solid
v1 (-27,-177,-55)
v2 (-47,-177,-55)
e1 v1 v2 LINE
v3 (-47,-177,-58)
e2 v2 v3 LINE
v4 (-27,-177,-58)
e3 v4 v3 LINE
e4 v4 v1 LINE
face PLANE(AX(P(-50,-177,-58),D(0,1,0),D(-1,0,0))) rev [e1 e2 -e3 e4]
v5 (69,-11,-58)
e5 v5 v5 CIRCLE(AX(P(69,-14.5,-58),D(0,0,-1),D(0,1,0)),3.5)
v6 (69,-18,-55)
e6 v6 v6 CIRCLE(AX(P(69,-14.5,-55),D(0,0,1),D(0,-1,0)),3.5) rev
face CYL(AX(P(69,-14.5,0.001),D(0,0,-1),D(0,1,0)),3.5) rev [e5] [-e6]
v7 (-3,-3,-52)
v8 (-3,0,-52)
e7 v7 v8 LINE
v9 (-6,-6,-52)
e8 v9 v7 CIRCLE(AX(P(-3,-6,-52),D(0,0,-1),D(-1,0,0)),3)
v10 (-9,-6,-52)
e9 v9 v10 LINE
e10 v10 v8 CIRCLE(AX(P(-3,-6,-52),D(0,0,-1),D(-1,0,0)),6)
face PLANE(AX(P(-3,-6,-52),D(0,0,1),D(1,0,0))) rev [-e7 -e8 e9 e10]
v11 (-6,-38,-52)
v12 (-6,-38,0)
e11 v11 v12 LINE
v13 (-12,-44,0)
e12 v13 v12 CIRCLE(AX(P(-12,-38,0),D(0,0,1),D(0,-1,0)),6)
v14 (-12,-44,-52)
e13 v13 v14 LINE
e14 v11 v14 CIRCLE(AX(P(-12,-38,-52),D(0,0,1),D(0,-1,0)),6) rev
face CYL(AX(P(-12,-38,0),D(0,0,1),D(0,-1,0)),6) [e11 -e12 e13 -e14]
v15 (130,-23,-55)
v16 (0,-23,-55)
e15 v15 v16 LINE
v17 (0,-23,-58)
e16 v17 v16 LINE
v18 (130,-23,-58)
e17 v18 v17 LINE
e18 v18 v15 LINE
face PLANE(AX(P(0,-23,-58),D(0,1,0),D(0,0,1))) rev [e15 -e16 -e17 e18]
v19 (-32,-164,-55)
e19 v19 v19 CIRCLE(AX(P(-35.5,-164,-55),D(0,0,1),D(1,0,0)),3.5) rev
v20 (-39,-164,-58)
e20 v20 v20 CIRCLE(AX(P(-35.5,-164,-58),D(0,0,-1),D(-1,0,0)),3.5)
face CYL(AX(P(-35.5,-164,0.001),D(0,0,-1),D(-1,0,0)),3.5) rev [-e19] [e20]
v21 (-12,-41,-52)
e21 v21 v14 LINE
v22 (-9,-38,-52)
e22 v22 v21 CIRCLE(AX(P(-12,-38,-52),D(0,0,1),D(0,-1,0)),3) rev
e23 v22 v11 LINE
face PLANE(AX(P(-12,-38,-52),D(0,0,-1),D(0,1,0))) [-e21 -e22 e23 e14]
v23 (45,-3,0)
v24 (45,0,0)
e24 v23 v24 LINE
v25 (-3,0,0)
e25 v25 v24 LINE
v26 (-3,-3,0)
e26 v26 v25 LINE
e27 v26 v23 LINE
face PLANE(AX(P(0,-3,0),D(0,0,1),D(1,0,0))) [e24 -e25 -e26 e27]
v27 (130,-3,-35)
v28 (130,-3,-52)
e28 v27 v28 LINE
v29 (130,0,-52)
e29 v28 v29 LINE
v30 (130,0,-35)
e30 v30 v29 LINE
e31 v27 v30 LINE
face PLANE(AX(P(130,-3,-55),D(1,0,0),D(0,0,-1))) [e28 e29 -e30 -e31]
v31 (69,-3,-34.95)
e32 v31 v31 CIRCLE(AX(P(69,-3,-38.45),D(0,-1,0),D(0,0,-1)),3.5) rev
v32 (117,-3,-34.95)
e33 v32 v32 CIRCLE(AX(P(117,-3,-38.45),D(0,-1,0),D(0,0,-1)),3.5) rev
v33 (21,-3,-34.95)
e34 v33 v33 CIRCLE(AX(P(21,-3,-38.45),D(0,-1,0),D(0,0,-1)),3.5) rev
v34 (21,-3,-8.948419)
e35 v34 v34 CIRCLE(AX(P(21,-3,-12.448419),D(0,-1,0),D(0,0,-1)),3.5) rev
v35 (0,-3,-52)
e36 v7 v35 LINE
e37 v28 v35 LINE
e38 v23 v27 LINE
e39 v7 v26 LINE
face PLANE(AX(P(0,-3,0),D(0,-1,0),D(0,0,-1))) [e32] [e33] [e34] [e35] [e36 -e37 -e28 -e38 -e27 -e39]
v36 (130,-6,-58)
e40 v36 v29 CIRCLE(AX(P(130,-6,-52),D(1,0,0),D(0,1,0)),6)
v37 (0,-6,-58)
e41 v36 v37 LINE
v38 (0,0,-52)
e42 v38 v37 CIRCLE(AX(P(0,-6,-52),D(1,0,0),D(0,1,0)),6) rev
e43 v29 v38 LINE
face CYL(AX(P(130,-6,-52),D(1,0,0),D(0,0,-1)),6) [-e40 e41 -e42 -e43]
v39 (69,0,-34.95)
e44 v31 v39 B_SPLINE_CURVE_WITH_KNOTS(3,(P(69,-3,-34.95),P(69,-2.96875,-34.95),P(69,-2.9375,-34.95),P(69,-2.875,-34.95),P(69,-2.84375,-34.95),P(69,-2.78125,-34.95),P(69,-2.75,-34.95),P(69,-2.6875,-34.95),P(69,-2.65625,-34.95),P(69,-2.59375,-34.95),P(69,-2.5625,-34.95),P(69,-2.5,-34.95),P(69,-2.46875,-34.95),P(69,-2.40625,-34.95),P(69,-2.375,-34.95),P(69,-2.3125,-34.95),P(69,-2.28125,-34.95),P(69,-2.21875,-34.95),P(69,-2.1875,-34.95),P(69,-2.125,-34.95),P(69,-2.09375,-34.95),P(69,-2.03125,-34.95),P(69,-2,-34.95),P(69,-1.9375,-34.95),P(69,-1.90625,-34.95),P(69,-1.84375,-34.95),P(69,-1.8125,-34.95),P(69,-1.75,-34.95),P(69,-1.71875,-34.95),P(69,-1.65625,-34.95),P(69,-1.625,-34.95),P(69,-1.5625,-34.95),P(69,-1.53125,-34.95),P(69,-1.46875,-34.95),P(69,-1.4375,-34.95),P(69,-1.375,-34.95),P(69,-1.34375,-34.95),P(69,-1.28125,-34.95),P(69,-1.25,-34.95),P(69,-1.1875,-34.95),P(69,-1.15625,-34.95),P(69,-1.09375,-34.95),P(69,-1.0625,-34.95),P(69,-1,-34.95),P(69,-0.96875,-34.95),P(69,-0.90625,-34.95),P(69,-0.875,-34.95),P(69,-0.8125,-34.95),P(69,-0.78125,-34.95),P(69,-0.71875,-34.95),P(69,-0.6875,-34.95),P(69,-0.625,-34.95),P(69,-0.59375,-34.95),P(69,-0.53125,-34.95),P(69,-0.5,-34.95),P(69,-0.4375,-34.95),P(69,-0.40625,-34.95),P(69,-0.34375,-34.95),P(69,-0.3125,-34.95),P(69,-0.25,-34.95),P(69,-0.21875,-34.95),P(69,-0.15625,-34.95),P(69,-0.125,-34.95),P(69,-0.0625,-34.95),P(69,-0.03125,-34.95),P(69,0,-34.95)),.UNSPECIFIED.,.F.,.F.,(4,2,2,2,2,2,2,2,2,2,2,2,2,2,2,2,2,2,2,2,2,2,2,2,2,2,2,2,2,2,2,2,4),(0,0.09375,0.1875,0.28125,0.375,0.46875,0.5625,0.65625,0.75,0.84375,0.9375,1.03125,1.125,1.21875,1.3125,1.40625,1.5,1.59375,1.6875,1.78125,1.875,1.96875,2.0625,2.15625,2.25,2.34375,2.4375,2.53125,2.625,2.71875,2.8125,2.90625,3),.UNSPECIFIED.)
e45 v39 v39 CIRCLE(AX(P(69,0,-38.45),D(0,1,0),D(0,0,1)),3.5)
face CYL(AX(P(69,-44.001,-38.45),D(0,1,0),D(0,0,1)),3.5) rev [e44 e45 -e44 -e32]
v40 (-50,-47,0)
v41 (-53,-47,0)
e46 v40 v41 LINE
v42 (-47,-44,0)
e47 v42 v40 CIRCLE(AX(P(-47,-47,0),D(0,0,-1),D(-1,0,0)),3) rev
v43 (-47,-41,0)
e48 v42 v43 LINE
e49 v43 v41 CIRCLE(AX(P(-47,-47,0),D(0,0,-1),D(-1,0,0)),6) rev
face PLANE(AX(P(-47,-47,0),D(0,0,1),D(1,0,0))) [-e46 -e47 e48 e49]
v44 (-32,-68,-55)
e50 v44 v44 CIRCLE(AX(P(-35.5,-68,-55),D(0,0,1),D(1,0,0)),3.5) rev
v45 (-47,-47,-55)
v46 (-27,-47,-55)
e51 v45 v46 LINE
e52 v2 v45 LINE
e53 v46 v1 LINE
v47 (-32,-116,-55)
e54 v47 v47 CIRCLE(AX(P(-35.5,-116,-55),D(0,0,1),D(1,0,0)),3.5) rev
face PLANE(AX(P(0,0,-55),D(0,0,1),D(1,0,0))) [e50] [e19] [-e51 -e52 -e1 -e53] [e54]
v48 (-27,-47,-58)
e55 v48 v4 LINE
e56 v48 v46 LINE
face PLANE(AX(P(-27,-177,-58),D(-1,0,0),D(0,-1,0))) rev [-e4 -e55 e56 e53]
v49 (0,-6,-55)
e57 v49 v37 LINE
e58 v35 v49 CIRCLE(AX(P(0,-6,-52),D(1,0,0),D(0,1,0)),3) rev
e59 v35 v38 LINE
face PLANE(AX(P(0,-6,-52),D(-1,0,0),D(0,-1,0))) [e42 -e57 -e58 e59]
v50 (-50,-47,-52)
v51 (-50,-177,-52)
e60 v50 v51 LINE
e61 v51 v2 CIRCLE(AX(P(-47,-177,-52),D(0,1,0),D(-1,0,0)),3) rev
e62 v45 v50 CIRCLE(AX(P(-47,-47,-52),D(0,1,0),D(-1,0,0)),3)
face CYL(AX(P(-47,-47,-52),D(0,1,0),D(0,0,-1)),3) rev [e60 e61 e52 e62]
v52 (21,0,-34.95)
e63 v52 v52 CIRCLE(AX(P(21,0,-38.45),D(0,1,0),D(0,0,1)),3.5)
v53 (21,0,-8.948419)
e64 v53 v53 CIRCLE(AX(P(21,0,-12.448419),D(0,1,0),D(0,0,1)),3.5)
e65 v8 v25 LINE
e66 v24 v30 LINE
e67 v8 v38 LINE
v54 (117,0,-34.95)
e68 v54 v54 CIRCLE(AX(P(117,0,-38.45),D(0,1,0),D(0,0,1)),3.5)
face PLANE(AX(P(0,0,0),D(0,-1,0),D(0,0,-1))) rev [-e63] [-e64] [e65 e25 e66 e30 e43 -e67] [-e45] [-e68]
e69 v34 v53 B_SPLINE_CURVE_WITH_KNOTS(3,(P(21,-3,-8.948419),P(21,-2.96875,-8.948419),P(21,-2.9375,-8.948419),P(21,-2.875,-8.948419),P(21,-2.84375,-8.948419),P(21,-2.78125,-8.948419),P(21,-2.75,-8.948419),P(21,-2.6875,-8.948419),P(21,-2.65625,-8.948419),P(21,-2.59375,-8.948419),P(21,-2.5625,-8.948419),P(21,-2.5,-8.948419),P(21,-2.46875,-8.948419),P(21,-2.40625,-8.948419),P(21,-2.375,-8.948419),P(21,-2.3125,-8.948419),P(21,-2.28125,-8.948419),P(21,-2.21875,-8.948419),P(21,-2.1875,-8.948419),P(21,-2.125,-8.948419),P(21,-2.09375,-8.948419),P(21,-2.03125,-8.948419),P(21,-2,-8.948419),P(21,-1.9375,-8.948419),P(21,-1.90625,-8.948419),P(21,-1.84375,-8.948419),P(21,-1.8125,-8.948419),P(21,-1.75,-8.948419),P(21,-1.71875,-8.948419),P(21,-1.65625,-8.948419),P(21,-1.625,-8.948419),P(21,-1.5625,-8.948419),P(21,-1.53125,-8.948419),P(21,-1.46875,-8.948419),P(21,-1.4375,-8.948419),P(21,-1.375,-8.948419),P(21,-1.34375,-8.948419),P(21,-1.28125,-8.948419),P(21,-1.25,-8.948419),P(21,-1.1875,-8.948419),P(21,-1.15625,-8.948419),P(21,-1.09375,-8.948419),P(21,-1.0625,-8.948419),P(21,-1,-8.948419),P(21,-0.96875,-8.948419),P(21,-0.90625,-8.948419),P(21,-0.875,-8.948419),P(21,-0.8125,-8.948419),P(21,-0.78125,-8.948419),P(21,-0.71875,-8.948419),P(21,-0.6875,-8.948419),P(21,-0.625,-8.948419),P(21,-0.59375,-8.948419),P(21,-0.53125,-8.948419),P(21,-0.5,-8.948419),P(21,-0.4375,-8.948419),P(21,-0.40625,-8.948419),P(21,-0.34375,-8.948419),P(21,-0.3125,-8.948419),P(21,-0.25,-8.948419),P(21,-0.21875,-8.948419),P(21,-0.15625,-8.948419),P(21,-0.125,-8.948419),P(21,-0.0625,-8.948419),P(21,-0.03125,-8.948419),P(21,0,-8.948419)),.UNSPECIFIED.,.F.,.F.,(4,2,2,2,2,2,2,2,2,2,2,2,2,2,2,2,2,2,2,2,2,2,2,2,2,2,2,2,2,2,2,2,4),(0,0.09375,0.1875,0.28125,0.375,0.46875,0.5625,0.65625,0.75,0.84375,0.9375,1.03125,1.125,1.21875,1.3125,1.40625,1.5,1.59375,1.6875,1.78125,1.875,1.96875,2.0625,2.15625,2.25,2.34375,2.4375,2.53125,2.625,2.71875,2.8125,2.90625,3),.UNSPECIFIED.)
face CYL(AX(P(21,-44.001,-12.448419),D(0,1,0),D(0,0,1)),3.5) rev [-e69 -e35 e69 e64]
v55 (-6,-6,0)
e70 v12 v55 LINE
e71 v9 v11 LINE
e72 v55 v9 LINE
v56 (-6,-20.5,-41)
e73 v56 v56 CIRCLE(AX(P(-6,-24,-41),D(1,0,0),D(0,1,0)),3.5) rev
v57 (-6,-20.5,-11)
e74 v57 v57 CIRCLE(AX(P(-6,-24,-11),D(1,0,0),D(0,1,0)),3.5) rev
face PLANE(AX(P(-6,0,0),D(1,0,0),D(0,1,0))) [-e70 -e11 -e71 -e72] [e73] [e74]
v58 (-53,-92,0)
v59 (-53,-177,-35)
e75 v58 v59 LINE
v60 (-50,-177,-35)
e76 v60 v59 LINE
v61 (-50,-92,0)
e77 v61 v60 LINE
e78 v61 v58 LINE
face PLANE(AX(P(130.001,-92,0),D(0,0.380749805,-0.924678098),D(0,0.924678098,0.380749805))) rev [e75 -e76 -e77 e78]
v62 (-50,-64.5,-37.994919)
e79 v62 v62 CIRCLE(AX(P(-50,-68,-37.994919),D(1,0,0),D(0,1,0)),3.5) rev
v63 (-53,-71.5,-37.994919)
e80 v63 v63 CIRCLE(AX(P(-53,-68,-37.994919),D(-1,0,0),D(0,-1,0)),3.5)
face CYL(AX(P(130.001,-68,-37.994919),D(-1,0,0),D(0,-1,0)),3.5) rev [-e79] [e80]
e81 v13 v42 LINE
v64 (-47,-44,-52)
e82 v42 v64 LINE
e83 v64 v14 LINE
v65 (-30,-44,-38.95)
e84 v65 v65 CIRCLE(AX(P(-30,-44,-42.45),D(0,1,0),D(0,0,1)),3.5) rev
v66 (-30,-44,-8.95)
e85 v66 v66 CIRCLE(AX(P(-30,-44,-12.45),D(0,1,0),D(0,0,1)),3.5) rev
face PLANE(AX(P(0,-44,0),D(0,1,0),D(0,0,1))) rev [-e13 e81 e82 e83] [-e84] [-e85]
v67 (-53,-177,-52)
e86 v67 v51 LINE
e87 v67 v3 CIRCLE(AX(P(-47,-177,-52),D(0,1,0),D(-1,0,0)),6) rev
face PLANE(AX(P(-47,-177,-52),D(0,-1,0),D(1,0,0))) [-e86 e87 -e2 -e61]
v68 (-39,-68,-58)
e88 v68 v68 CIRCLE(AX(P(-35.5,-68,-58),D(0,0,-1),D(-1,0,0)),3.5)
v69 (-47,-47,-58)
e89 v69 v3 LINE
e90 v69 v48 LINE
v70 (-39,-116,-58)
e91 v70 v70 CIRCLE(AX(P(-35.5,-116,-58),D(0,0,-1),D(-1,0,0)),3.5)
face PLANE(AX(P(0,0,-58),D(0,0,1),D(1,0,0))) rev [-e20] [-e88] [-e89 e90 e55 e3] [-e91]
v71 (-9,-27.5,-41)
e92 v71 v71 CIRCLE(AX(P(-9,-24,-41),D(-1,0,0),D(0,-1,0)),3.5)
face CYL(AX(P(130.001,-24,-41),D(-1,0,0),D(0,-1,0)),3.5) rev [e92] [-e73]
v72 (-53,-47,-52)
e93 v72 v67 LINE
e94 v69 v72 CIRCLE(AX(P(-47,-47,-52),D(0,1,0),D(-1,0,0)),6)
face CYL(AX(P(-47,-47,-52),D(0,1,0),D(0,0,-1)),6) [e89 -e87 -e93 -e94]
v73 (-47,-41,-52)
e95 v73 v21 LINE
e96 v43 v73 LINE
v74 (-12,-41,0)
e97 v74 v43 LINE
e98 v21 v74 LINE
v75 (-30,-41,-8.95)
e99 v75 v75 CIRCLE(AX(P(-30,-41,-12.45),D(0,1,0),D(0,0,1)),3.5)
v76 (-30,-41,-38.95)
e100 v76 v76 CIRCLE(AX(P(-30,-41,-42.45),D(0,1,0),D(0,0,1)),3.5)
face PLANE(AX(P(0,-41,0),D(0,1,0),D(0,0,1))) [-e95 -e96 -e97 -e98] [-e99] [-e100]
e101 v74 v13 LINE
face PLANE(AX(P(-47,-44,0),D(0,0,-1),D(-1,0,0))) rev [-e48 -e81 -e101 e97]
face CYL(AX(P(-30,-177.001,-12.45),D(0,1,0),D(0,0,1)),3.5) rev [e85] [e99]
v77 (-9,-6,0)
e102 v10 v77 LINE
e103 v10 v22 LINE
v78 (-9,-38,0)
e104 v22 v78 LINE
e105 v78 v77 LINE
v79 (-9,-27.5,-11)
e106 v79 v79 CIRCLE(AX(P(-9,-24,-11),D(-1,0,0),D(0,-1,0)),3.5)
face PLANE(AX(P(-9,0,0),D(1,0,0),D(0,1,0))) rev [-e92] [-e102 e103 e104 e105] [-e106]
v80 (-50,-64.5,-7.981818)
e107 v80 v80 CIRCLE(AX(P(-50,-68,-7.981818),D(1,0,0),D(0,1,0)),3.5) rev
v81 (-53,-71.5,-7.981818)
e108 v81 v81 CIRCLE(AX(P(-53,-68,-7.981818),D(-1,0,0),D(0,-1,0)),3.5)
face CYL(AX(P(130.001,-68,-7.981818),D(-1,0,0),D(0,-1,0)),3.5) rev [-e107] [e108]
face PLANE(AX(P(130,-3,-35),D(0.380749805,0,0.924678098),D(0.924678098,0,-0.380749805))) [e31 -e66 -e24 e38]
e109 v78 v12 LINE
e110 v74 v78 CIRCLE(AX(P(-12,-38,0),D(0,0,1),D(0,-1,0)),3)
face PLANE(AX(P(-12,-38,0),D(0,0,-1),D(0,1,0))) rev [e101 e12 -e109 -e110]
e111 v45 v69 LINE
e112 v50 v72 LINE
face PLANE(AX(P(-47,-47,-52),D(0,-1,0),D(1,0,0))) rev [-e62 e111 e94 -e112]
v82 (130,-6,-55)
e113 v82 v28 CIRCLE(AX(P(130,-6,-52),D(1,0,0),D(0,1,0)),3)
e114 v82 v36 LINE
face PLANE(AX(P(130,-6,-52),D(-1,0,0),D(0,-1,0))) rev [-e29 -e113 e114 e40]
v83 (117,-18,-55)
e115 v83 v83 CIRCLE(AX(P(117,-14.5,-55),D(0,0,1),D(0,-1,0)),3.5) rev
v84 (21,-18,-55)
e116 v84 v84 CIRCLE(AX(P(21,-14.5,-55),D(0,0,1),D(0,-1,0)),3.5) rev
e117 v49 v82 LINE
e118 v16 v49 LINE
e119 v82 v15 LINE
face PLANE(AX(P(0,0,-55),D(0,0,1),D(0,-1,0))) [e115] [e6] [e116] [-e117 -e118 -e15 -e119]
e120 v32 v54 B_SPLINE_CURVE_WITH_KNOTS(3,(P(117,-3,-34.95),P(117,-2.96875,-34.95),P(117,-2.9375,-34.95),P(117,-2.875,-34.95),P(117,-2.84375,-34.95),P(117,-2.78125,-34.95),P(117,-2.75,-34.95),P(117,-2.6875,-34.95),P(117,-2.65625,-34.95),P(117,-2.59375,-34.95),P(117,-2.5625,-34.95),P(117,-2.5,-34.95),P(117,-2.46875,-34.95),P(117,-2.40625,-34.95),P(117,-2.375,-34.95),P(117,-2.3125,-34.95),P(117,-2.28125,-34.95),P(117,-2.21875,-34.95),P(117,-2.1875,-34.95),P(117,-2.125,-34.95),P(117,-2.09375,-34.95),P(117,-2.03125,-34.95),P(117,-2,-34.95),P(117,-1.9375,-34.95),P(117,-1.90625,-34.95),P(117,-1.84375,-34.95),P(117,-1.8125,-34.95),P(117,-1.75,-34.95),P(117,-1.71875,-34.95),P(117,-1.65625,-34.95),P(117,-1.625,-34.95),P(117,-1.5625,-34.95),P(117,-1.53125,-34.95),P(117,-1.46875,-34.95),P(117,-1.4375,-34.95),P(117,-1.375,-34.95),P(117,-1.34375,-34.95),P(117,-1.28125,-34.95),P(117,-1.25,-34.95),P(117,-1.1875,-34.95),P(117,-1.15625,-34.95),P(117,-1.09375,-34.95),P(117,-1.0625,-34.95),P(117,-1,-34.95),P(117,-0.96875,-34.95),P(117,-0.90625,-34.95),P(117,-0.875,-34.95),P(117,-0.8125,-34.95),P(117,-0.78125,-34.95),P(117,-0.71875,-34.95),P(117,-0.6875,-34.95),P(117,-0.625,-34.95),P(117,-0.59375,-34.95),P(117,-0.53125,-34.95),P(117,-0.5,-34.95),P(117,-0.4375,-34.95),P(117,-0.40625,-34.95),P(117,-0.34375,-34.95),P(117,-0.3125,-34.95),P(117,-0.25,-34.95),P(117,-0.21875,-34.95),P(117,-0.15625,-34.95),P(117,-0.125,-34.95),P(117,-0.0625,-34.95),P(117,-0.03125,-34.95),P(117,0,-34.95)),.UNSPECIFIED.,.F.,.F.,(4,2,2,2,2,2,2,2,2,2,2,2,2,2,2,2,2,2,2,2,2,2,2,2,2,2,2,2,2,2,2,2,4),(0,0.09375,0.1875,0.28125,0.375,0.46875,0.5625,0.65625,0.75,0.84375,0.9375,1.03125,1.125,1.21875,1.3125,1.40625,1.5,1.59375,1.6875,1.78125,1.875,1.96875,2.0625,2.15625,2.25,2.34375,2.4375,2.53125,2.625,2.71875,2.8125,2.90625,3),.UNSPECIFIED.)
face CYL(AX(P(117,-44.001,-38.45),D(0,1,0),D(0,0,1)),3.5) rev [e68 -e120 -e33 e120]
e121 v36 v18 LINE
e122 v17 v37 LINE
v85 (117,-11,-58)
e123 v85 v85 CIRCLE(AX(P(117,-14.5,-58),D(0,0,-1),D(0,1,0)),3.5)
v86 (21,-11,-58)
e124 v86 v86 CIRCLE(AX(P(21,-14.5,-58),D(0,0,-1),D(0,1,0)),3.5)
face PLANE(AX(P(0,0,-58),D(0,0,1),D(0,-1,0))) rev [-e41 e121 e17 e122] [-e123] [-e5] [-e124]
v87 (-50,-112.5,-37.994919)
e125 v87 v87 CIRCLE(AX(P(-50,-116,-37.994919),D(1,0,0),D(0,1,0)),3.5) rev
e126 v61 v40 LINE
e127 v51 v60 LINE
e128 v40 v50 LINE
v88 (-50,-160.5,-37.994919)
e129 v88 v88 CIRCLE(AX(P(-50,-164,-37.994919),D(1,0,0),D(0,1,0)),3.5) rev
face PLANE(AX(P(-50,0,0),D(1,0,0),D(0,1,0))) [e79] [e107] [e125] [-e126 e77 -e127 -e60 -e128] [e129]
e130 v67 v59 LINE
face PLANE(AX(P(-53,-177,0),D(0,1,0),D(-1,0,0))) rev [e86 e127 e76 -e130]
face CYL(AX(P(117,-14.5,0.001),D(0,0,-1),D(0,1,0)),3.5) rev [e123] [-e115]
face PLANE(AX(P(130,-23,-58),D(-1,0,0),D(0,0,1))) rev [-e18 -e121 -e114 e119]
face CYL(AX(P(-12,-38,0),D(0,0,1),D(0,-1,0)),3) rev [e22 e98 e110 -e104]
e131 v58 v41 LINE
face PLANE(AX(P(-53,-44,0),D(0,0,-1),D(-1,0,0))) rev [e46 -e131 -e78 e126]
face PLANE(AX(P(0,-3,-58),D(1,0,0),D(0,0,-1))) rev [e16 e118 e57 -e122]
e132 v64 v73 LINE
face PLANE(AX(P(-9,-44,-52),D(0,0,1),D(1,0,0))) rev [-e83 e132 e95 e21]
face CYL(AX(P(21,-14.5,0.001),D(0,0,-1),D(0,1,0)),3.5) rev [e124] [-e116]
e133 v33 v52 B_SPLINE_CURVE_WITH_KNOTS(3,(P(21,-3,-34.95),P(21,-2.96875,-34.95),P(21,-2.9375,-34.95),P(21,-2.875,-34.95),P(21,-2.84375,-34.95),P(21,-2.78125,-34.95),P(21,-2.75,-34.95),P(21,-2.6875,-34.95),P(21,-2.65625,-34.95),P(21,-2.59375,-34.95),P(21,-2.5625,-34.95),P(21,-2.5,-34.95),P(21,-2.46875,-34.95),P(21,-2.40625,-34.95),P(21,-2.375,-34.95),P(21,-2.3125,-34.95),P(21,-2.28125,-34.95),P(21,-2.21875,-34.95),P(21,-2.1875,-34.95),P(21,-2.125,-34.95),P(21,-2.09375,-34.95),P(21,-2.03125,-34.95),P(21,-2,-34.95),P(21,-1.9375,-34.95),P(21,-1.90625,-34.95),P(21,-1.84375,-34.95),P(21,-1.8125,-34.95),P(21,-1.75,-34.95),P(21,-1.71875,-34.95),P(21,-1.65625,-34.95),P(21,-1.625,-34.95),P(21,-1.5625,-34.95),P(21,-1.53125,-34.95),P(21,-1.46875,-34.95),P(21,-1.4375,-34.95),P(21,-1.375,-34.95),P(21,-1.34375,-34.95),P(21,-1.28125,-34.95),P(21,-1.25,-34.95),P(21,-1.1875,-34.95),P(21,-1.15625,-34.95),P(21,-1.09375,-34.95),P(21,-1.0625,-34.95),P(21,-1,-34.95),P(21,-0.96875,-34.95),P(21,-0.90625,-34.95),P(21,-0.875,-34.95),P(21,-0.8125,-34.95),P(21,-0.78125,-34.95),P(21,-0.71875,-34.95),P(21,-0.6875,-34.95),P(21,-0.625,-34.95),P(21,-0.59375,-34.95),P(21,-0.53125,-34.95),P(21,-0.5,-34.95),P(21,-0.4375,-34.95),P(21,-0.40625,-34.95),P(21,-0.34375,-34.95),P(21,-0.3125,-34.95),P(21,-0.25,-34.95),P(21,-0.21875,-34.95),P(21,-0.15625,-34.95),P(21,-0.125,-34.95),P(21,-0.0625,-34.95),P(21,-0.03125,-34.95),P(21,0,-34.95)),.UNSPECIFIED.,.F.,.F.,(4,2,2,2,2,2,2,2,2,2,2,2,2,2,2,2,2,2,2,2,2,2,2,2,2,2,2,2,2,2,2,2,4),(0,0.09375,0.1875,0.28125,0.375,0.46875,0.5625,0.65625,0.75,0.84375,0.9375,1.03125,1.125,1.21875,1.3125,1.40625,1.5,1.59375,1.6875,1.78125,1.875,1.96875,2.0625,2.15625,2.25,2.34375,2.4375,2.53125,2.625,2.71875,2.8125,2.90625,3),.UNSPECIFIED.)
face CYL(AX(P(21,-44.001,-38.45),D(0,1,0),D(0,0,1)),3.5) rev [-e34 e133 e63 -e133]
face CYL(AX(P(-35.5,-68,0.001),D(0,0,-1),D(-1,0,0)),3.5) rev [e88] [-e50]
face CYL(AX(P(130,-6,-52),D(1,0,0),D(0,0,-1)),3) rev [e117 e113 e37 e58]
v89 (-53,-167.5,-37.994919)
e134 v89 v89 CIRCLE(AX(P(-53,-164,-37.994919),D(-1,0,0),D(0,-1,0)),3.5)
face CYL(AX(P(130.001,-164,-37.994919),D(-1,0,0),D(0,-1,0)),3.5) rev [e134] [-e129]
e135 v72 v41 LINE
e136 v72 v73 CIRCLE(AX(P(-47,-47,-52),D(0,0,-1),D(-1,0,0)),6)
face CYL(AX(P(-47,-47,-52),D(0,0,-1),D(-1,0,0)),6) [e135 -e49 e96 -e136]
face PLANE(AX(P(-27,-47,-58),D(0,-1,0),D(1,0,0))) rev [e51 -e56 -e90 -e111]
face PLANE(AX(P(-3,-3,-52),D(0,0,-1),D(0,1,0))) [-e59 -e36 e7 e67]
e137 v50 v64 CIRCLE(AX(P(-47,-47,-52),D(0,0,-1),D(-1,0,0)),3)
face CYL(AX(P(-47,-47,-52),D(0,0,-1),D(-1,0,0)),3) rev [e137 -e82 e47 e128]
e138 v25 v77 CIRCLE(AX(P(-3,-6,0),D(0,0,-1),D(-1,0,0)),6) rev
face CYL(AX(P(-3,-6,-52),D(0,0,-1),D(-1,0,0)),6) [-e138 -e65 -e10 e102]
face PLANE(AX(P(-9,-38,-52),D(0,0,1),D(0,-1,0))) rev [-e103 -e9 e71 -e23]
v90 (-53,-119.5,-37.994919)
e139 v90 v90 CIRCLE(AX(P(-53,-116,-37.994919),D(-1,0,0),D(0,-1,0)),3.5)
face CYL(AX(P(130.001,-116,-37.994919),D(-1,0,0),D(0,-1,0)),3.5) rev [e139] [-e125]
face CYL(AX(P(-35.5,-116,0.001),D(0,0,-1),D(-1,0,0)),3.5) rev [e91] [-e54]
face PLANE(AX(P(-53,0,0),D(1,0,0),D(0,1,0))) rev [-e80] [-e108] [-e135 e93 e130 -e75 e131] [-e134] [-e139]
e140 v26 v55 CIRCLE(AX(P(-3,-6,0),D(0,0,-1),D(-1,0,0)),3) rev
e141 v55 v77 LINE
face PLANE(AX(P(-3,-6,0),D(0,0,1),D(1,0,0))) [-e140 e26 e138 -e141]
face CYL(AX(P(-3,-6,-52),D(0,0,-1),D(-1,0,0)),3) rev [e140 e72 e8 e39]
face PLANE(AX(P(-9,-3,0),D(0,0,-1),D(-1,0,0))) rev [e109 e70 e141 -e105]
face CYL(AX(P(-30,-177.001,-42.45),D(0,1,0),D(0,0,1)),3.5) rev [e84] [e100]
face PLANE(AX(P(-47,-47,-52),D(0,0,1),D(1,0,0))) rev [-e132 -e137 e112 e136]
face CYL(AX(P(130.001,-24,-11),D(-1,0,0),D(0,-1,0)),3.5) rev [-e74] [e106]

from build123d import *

# Parameters (mm, degrees)
SM_BASE_FLANGE_1_DEPTH           = 3
SM_EDGE_FLANGE_1_STRIP_W         = 18
SM_EDGE_FLANGE_1_STRIP_H         = 3
SM_EDGE_FLANGE_1_STRIP_CUT_DEPTH = 130
SM_EDGE_FLANGE_1_DEPTH           = 130
SM_EDGE_FLANGE_2_DEPTH           = 52
SM_EDGE_FLANGE_5_DEPTH           = 52
CUT_EXTRUDE_2_REACH              = 158.911
SKETCH_48_R                      = 3.5
CUT_EXTRUDE_3_REACH              = 150.997
SKETCH_49_R                      = 3.5
CUT_EXTRUDE_4_REACH              = 150.997
SKETCH_51_R                      = 3.5
SM_EDGE_FLANGE_6_DEPTH           = 52
CUT_EXTRUDE_5_REACH              = 263.117
SKETCH_59_R                      = 3.5
SM_EDGE_FLANGE_8_DEPTH           = 130
CUT_EXTRUDE_6_REACH              = 229.141
SKETCH_68_R                      = 3.5
CUT_EXTRUDE_7_REACH              = 198.876
SKETCH_69_R                      = 3.5


# Sheet-metal steps are written as plain solids
with BuildPart() as part:
    # Sketch 2 → Базовая кромка1 (new body)
    with BuildSketch(Plane(origin=(0, 0, 0), x_dir=(1, 0, 0), z_dir=(0, 1, 0))):
        Polygon((45, 55), (130, 55), (130, 35), (45, 0), (0, 0), (0, 55), align=None)
    extrude(amount=-SM_BASE_FLANGE_1_DEPTH)

    # Ребро-кромка1 strip (across the edge) → Ребро-кромка1 strip cut (cut)
    with BuildSketch(Plane(origin=(0, -3, -55), x_dir=(0, 0, 1), z_dir=(1, 0, 0))):
        with Locations((-6, -1.5)):
            Rectangle(SM_EDGE_FLANGE_1_STRIP_W, SM_EDGE_FLANGE_1_STRIP_H)
    extrude(amount=SM_EDGE_FLANGE_1_STRIP_CUT_DEPTH, mode=Mode.SUBTRACT)

    # Ребро-кромка1 section (across the edge) → Ребро-кромка1 (add)
    with BuildSketch(Plane(origin=(0, -3, -55), x_dir=(0, 0, 1), z_dir=(1, 0, 0))):
        with BuildLine():
            Line((-3, 3), (-3, 20))
            Line((-3, 20), (0, 20))
            Line((0, 20), (0, 3))
            ThreePointArc((0, 3), (0.878679656, 0.878679656), (3, 0))
            Line((3, 0), (3, -3))
            ThreePointArc((3, -3), (-1.242640687, -1.242640687), (-3, 3))
        make_face()
    extrude(amount=SM_EDGE_FLANGE_1_DEPTH)

    # Ребро-кромка2 section (across the edge) → Ребро-кромка2 (add)
    with BuildSketch(Plane(origin=(-6, -3, 0), x_dir=(1, 0, 0), z_dir=(0, 0, -1))):
        with BuildLine():
            Line((-3, 3), (-3, 35))
            Line((-3, 35), (0, 35))
            Line((0, 35), (0, 3))
            ThreePointArc((0, 3), (0.878679656, 0.878679656), (3, 0))
            Line((3, 0), (6, 0))
            Line((6, 0), (6, -3))
            Line((6, -3), (3, -3))
            ThreePointArc((3, -3), (-1.242640687, -1.242640687), (-3, 3))
        make_face()
    extrude(amount=SM_EDGE_FLANGE_2_DEPTH)

    # Ребро-кромка5 section (across the edge) → Ребро-кромка5 (add)
    with BuildSketch(Plane(origin=(-9, -41, -52), x_dir=(0, 1, 0), z_dir=(0, 0, 1))):
        with BuildLine():
            Line((-3, 3), (-3, 38))
            Line((-3, 38), (0, 38))
            Line((0, 38), (0, 3))
            ThreePointArc((0, 3), (0.878679656, 0.878679656), (3, 0))
            Line((3, 0), (3, -3))
            ThreePointArc((3, -3), (-1.242640687, -1.242640687), (-3, 3))
        make_face()
    extrude(amount=SM_EDGE_FLANGE_5_DEPTH)

    # Эскиз48 → Вырез-Вытянуть2 (cut, up to next)
    with BuildSketch(Plane.ZY.offset(9), mode=Mode.PRIVATE) as cut_extrude_2_sk1:
        with Locations(Location((-41, -24, 0), (0, 0, 270))):
            Circle(SKETCH_48_R)
    cut_extrude_2_tool1 = extrude(cut_extrude_2_sk1.sketch, amount=-CUT_EXTRUDE_2_REACH, mode=Mode.PRIVATE) & part.part
    # Эскиз48 → Вырез-Вытянуть2 (cut, up to next)
    with BuildSketch(Plane.ZY.offset(9), mode=Mode.PRIVATE) as cut_extrude_2_sk2:
        with Locations(Location((-11, -24, 0), (0, 0, 270))):
            Circle(SKETCH_48_R)
    cut_extrude_2_tool2 = extrude(cut_extrude_2_sk2.sketch, amount=-CUT_EXTRUDE_2_REACH, mode=Mode.PRIVATE) & part.part
    add(cut_extrude_2_tool1.solids().sort_by_distance((-9, -24, -41))[0], mode=Mode.SUBTRACT)
    add(cut_extrude_2_tool2.solids().sort_by_distance((-9, -24, -11))[0], mode=Mode.SUBTRACT)

    # Эскиз49 → Вырез-Вытянуть3 (cut, up to next)
    with BuildSketch(Plane(origin=(0, 0, 0), x_dir=(1, 0, 0), z_dir=(0, 1, 0)), mode=Mode.PRIVATE) as cut_extrude_3_sk1:
        with Locations(Location((21, 12.448418776, 0), (0, 0, 270))):
            Circle(SKETCH_49_R)
    cut_extrude_3_tool1 = extrude(cut_extrude_3_sk1.sketch, amount=-CUT_EXTRUDE_3_REACH, mode=Mode.PRIVATE) & part.part
    # Эскиз49 → Вырез-Вытянуть3 (cut, up to next)
    with BuildSketch(Plane(origin=(0, 0, 0), x_dir=(1, 0, 0), z_dir=(0, 1, 0)), mode=Mode.PRIVATE) as cut_extrude_3_sk2:
        with Locations(Location((21, 38.45, 0), (0, 0, 270))):
            Circle(SKETCH_49_R)
    cut_extrude_3_tool2 = extrude(cut_extrude_3_sk2.sketch, amount=-CUT_EXTRUDE_3_REACH, mode=Mode.PRIVATE) & part.part
    # Эскиз49 → Вырез-Вытянуть3 (cut, up to next)
    with BuildSketch(Plane(origin=(0, 0, 0), x_dir=(1, 0, 0), z_dir=(0, 1, 0)), mode=Mode.PRIVATE) as cut_extrude_3_sk3:
        with Locations(Location((117, 38.45, 0), (0, 0, 270))):
            Circle(SKETCH_49_R)
    cut_extrude_3_tool3 = extrude(cut_extrude_3_sk3.sketch, amount=-CUT_EXTRUDE_3_REACH, mode=Mode.PRIVATE) & part.part
    # Эскиз49 → Вырез-Вытянуть3 (cut, up to next)
    with BuildSketch(Plane(origin=(0, 0, 0), x_dir=(1, 0, 0), z_dir=(0, 1, 0)), mode=Mode.PRIVATE) as cut_extrude_3_sk4:
        with Locations(Location((69, 38.45, 0), (0, 0, 270))):
            Circle(SKETCH_49_R)
    cut_extrude_3_tool4 = extrude(cut_extrude_3_sk4.sketch, amount=-CUT_EXTRUDE_3_REACH, mode=Mode.PRIVATE) & part.part
    add(cut_extrude_3_tool1.solids().sort_by_distance((21, 0, -12.448419))[0], mode=Mode.SUBTRACT)
    add(cut_extrude_3_tool2.solids().sort_by_distance((21, 0, -38.45))[0], mode=Mode.SUBTRACT)
    add(cut_extrude_3_tool3.solids().sort_by_distance((117, 0, -38.45))[0], mode=Mode.SUBTRACT)
    add(cut_extrude_3_tool4.solids().sort_by_distance((69, 0, -38.45))[0], mode=Mode.SUBTRACT)

    # Эскиз51 → Вырез-Вытянуть4 (cut, up to next)
    with BuildSketch(Plane(origin=(0, 0, -58), x_dir=(-1, 0, 0), z_dir=(0, 0, -1)), mode=Mode.PRIVATE) as cut_extrude_4_sk1:
        with Locations(Location((-117, -14.5, 0), (0, 0, 90))):
            Circle(SKETCH_51_R)
    cut_extrude_4_tool1 = extrude(cut_extrude_4_sk1.sketch, amount=-CUT_EXTRUDE_4_REACH, mode=Mode.PRIVATE) & part.part
    # Эскиз51 → Вырез-Вытянуть4 (cut, up to next)
    with BuildSketch(Plane(origin=(0, 0, -58), x_dir=(-1, 0, 0), z_dir=(0, 0, -1)), mode=Mode.PRIVATE) as cut_extrude_4_sk2:
        with Locations(Location((-69, -14.5, 0), (0, 0, 90))):
            Circle(SKETCH_51_R)
    cut_extrude_4_tool2 = extrude(cut_extrude_4_sk2.sketch, amount=-CUT_EXTRUDE_4_REACH, mode=Mode.PRIVATE) & part.part
    # Эскиз51 → Вырез-Вытянуть4 (cut, up to next)
    with BuildSketch(Plane(origin=(0, 0, -58), x_dir=(-1, 0, 0), z_dir=(0, 0, -1)), mode=Mode.PRIVATE) as cut_extrude_4_sk3:
        with Locations(Location((-21, -14.5, 0), (0, 0, 90))):
            Circle(SKETCH_51_R)
    cut_extrude_4_tool3 = extrude(cut_extrude_4_sk3.sketch, amount=-CUT_EXTRUDE_4_REACH, mode=Mode.PRIVATE) & part.part
    add(cut_extrude_4_tool1.solids().sort_by_distance((117, -14.5, -58))[0], mode=Mode.SUBTRACT)
    add(cut_extrude_4_tool2.solids().sort_by_distance((69, -14.5, -58))[0], mode=Mode.SUBTRACT)
    add(cut_extrude_4_tool3.solids().sort_by_distance((21, -14.5, -58))[0], mode=Mode.SUBTRACT)

    # Ребро-кромка6 section (across the edge) → Ребро-кромка6 (add)
    with BuildSketch(Plane(origin=(-50, -44, 0), x_dir=(1, 0, 0), z_dir=(0, 0, -1))):
        with BuildLine():
            Line((-3, 3), (-3, 133))
            Line((-3, 133), (0, 133))
            Line((0, 133), (0, 3))
            ThreePointArc((0, 3), (0.878679656, 0.878679656), (3, 0))
            Line((3, 0), (3, -3))
            ThreePointArc((3, -3), (-1.242640687, -1.242640687), (-3, 3))
        make_face()
    extrude(amount=SM_EDGE_FLANGE_6_DEPTH)

    # Эскиз59 → Вырез-Вытянуть5 (cut, up to next)
    with BuildSketch(Plane.ZY.offset(53), mode=Mode.PRIVATE) as cut_extrude_5_sk1:
        with Locations(Location((-7.981818004, -68, 0), (0, 0, 270))):
            Circle(SKETCH_59_R)
    cut_extrude_5_tool1 = extrude(cut_extrude_5_sk1.sketch, amount=-CUT_EXTRUDE_5_REACH, mode=Mode.PRIVATE) & part.part
    # Эскиз59 → Вырез-Вытянуть5 (cut, up to next)
    with BuildSketch(Plane.ZY.offset(53), mode=Mode.PRIVATE) as cut_extrude_5_sk2:
        with Locations(Location((-37.994919226, -68, 0), (0, 0, 270))):
            Circle(SKETCH_59_R)
    cut_extrude_5_tool2 = extrude(cut_extrude_5_sk2.sketch, amount=-CUT_EXTRUDE_5_REACH, mode=Mode.PRIVATE) & part.part
    # Эскиз59 → Вырез-Вытянуть5 (cut, up to next)
    with BuildSketch(Plane.ZY.offset(53), mode=Mode.PRIVATE) as cut_extrude_5_sk3:
        with Locations(Location((-37.994919226, -116, 0), (0, 0, 270))):
            Circle(SKETCH_59_R)
    cut_extrude_5_tool3 = extrude(cut_extrude_5_sk3.sketch, amount=-CUT_EXTRUDE_5_REACH, mode=Mode.PRIVATE) & part.part
    # Эскиз59 → Вырез-Вытянуть5 (cut, up to next)
    with BuildSketch(Plane.ZY.offset(53), mode=Mode.PRIVATE) as cut_extrude_5_sk4:
        with Locations(Location((-37.994919226, -164, 0), (0, 0, 270))):
            Circle(SKETCH_59_R)
    cut_extrude_5_tool4 = extrude(cut_extrude_5_sk4.sketch, amount=-CUT_EXTRUDE_5_REACH, mode=Mode.PRIVATE) & part.part
    # Эскиз59 → Вырез-Вытянуть5 (cut, up to next)
    with BuildSketch(Plane.ZY.offset(53), mode=Mode.PRIVATE) as cut_extrude_5_sk5:
        Polygon((0, -92), (-35, -177), (0, -177), align=None)
    cut_extrude_5_tool5 = extrude(cut_extrude_5_sk5.sketch, amount=-CUT_EXTRUDE_5_REACH, mode=Mode.PRIVATE) & part.part
    add(cut_extrude_5_tool1.solids().sort_by_distance((-53, -68, -7.981818))[0], mode=Mode.SUBTRACT)
    add(cut_extrude_5_tool2.solids().sort_by_distance((-53, -68, -37.994919))[0], mode=Mode.SUBTRACT)
    add(cut_extrude_5_tool3.solids().sort_by_distance((-53, -116, -37.994919))[0], mode=Mode.SUBTRACT)
    add(cut_extrude_5_tool4.solids().sort_by_distance((-53, -164, -37.994919))[0], mode=Mode.SUBTRACT)
    add(cut_extrude_5_tool5.solids().sort_by_distance((-53, -148.666667, -11.666667))[0], mode=Mode.SUBTRACT)

    # Ребро-кромка8 section (across the edge) → Ребро-кромка8 (add)
    with BuildSketch(Plane(origin=(-50, -177, -55), x_dir=(0, 0, 1), z_dir=(0, 1, 0))):
        with BuildLine():
            Line((-3, 3), (-3, 23))
            Line((-3, 23), (0, 23))
            Line((0, 23), (0, 3))
            ThreePointArc((0, 3), (0.878679656, 0.878679656), (3, 0))
            Line((3, 0), (3, -3))
            ThreePointArc((3, -3), (-1.242640687, -1.242640687), (-3, 3))
        make_face()
    extrude(amount=SM_EDGE_FLANGE_8_DEPTH)

    # Эскиз68 → Вырез-Вытянуть6 (cut, up to next)
    with BuildSketch(Plane(origin=(0, 0, -58), x_dir=(-1, 0, 0), z_dir=(0, 0, -1)), mode=Mode.PRIVATE) as cut_extrude_6_sk1:
        with Locations((35.5, -68)):
            Circle(SKETCH_68_R)
    cut_extrude_6_tool1 = extrude(cut_extrude_6_sk1.sketch, amount=-CUT_EXTRUDE_6_REACH, mode=Mode.PRIVATE) & part.part
    # Эскиз68 → Вырез-Вытянуть6 (cut, up to next)
    with BuildSketch(Plane(origin=(0, 0, -58), x_dir=(-1, 0, 0), z_dir=(0, 0, -1)), mode=Mode.PRIVATE) as cut_extrude_6_sk2:
        with Locations((35.5, -116)):
            Circle(SKETCH_68_R)
    cut_extrude_6_tool2 = extrude(cut_extrude_6_sk2.sketch, amount=-CUT_EXTRUDE_6_REACH, mode=Mode.PRIVATE) & part.part
    # Эскиз68 → Вырез-Вытянуть6 (cut, up to next)
    with BuildSketch(Plane(origin=(0, 0, -58), x_dir=(-1, 0, 0), z_dir=(0, 0, -1)), mode=Mode.PRIVATE) as cut_extrude_6_sk3:
        with Locations((35.5, -164)):
            Circle(SKETCH_68_R)
    cut_extrude_6_tool3 = extrude(cut_extrude_6_sk3.sketch, amount=-CUT_EXTRUDE_6_REACH, mode=Mode.PRIVATE) & part.part
    add(cut_extrude_6_tool1.solids().sort_by_distance((-35.5, -68, -58))[0], mode=Mode.SUBTRACT)
    add(cut_extrude_6_tool2.solids().sort_by_distance((-35.5, -116, -58))[0], mode=Mode.SUBTRACT)
    add(cut_extrude_6_tool3.solids().sort_by_distance((-35.5, -164, -58))[0], mode=Mode.SUBTRACT)

    # Эскиз69 → Вырез-Вытянуть7 (cut, up to next)
    with BuildSketch(Plane(origin=(0, -41, 0), x_dir=(1, 0, 0), z_dir=(0, 1, 0)), mode=Mode.PRIVATE) as cut_extrude_7_sk1:
        with Locations(Location((-30, 42.45, 0), (0, 0, 270))):
            Circle(SKETCH_69_R)
    cut_extrude_7_tool1 = extrude(cut_extrude_7_sk1.sketch, amount=-CUT_EXTRUDE_7_REACH, mode=Mode.PRIVATE) & part.part
    # Эскиз69 → Вырез-Вытянуть7 (cut, up to next)
    with BuildSketch(Plane(origin=(0, -41, 0), x_dir=(1, 0, 0), z_dir=(0, 1, 0)), mode=Mode.PRIVATE) as cut_extrude_7_sk2:
        with Locations(Location((-30, 12.45, 0), (0, 0, 270))):
            Circle(SKETCH_69_R)
    cut_extrude_7_tool2 = extrude(cut_extrude_7_sk2.sketch, amount=-CUT_EXTRUDE_7_REACH, mode=Mode.PRIVATE) & part.part
    add(cut_extrude_7_tool1.solids().sort_by_distance((-30, -41, -42.45))[0], mode=Mode.SUBTRACT)
    add(cut_extrude_7_tool2.solids().sort_by_distance((-30, -41, -12.45))[0], mode=Mode.SUBTRACT)


solid = part.part
